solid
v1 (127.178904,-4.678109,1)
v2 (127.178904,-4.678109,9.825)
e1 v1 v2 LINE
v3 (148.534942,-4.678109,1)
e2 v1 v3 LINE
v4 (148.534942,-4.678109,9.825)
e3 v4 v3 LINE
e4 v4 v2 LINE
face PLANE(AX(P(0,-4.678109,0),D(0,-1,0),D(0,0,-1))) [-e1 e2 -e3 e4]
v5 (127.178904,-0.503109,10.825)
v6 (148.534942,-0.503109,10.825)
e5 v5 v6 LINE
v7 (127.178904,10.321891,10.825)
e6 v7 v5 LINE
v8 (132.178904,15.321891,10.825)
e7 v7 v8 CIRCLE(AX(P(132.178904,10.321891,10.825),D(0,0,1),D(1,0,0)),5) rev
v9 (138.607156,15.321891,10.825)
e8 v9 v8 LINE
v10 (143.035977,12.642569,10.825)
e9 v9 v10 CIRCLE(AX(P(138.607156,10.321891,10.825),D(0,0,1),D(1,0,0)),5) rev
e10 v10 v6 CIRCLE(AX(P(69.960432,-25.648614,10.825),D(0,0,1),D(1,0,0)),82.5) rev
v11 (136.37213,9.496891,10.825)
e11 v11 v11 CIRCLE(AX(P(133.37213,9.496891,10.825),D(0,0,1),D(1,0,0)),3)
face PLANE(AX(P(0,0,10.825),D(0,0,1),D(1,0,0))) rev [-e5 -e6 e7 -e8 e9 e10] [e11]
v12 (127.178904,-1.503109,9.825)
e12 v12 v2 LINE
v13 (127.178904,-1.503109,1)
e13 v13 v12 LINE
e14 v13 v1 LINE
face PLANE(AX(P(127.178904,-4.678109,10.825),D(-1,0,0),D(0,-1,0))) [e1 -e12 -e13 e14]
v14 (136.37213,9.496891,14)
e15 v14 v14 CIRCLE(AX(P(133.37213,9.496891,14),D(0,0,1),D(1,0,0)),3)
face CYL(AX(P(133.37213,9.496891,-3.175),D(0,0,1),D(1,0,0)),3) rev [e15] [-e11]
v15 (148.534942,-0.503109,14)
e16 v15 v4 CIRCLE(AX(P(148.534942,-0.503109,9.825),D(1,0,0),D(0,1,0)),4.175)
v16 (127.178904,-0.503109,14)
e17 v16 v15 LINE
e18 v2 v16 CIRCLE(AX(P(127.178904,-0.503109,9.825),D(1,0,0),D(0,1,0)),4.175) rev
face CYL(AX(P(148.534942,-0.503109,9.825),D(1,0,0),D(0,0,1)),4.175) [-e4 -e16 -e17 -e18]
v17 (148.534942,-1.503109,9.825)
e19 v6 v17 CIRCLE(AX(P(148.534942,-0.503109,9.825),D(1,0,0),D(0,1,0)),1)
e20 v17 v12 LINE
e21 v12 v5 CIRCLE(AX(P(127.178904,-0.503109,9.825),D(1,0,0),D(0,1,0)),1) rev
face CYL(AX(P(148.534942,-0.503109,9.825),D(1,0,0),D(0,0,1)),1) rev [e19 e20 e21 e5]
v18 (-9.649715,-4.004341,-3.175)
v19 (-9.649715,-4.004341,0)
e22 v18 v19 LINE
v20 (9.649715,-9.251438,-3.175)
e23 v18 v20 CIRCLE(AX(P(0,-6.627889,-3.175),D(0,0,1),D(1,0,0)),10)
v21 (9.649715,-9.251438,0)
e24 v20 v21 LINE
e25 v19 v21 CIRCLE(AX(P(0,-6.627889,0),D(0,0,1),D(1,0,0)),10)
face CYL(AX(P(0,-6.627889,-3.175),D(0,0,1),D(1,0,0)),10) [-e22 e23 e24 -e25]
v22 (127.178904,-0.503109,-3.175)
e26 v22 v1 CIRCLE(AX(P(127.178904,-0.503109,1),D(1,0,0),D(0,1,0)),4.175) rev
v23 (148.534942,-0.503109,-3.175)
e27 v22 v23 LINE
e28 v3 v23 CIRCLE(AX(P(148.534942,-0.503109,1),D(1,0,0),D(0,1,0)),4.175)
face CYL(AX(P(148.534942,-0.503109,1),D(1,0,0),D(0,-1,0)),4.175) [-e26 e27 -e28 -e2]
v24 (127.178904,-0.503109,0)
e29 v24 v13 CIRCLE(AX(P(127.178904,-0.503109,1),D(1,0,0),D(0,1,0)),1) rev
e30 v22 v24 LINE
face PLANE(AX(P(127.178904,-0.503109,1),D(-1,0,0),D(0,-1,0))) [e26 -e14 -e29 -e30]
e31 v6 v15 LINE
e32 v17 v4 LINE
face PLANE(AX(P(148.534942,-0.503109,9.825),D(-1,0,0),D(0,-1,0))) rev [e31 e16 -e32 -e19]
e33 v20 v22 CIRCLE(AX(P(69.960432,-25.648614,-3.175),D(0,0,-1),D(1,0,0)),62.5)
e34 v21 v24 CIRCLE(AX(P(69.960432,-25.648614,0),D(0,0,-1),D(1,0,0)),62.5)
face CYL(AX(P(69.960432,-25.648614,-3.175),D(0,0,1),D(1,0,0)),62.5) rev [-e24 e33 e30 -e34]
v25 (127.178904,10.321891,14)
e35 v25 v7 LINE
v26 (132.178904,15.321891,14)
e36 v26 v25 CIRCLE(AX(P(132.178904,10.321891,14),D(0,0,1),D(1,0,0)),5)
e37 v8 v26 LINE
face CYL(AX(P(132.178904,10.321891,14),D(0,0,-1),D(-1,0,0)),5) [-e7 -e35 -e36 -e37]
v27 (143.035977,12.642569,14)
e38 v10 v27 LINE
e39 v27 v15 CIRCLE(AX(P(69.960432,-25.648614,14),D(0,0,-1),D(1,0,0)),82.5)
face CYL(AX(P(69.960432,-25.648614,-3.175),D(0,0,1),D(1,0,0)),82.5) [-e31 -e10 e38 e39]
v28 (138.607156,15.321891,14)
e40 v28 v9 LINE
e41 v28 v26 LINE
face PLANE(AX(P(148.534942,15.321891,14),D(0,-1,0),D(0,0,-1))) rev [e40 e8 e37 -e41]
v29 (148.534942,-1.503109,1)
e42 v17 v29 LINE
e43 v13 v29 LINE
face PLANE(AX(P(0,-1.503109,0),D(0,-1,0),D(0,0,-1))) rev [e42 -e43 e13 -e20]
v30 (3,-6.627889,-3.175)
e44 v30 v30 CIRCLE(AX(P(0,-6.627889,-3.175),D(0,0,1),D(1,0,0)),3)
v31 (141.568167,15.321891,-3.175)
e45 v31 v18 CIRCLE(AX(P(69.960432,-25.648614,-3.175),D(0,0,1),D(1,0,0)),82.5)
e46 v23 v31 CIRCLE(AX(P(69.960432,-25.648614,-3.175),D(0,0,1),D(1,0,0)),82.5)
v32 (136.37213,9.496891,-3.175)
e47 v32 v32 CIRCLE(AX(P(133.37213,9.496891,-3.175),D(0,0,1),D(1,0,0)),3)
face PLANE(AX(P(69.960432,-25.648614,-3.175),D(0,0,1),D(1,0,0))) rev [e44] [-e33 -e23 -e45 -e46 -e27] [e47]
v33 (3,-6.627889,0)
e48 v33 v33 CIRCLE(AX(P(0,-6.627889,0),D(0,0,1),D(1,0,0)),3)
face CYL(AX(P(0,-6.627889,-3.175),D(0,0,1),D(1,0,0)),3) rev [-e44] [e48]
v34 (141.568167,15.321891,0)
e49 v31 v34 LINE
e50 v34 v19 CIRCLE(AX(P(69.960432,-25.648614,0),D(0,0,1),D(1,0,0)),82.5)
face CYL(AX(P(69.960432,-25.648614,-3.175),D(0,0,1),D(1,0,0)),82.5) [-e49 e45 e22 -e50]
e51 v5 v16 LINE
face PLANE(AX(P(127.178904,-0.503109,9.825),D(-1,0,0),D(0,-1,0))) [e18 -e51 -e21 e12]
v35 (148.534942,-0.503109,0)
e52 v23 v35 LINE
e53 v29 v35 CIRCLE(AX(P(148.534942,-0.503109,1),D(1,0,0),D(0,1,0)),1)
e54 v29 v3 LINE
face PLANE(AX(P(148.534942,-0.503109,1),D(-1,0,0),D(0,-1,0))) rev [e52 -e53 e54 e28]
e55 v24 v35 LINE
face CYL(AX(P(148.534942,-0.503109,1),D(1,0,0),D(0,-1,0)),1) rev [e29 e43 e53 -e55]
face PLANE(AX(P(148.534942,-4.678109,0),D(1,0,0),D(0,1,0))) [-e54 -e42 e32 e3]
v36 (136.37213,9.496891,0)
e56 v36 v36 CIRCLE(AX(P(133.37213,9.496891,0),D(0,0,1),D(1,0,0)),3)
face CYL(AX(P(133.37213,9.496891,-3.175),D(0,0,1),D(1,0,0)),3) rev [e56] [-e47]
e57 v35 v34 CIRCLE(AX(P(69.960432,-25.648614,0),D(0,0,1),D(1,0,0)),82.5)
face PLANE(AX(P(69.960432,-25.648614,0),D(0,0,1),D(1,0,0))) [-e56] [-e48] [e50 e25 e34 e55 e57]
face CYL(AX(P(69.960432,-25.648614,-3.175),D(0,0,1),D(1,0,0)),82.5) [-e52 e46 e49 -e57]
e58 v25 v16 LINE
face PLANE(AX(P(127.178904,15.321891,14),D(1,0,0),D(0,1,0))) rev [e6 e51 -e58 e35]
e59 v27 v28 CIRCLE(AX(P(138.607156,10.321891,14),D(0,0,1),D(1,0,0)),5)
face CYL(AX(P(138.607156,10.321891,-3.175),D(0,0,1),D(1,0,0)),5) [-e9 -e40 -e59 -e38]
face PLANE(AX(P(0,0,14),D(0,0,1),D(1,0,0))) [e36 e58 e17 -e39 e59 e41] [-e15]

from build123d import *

# Parameters (mm, degrees)
BASE_FLANGE1_DEPTH           = 3.175
EDGE_FLANGE1_DEPTH           = 21.356037378
EDGE_FLANGE2_STRIP_W         = 14.7
EDGE_FLANGE2_STRIP_H         = 3.175
EDGE_FLANGE2_STRIP_CUT_DEPTH = 21.356037378
EDGE_FLANGE2_DEPTH           = 21.356037378
CUT_EXTRUDE1_DEPTH           = 160.658100285
CUT_EXTRUDE1_DEPTH_BACK      = 160.658100285
SKETCH12_R                   = 3
FILLET1_R                    = 5


# Sheet-metal steps are written as plain solids
with BuildPart() as part:
    # Sketch1 → Base-Flange1 (new body)
    with BuildSketch(Plane.XY):
        with BuildLine():
            Line((127.178904259, -0.503108866), (143.372130178, -0.503108866))
            Line((143.372130178, -0.503108866), (148.534941637, -0.503108866))
            ThreePointArc((148.534941637, -0.503108866), (146.210001092, 5.851436917), (143.372130178, 11.994082058))
            ThreePointArc((143.372130178, 11.994082058), (61.381820352, 56.404158269), (-9.649714749, -4.004341098))
            ThreePointArc((-9.649714749, -4.004341098), (-2.623548221, -16.277604067), (9.649714749, -9.251437539))
            ThreePointArc((9.649714749, -9.251437539), (65.321056088, 36.678957766), (127.178904259, -0.503108866))
        make_face()
    extrude(amount=-BASE_FLANGE1_DEPTH)

    # Edge-Flange1 section (across the edge) → Edge-Flange1 (add)
    with BuildSketch(Plane(origin=(127.178904259, -1.503108866, 0), x_dir=(0, 1, 0), z_dir=(1, 0, 0))):
        with BuildLine():
            Line((-3.175, 1), (-3.175, 10.825))
            Line((-3.175, 10.825), (0, 10.825))
            Line((0, 10.825), (0, 1))
            ThreePointArc((0, 1), (0.292893219, 0.292893219), (1, 0))
            Line((1, 0), (1, -3.175))
            ThreePointArc((1, -3.175), (-1.952170811, -1.952170811), (-3.175, 1))
        make_face()
    extrude(amount=EDGE_FLANGE1_DEPTH)

    # Edge-Flange2 strip (across the edge) → Edge-Flange2 strip cut (cut)
    with BuildSketch(Plane(origin=(127.178904259, -1.503108866, 10.825), x_dir=(0, 0, -1), z_dir=(1, 0, 0))):
        with Locations((-6.35, -1.5875)):
            Rectangle(EDGE_FLANGE2_STRIP_W, EDGE_FLANGE2_STRIP_H)
    extrude(amount=EDGE_FLANGE2_STRIP_CUT_DEPTH, mode=Mode.SUBTRACT)

    # Edge-Flange2 section (across the edge) → Edge-Flange2 (add)
    with BuildSketch(Plane(origin=(127.178904259, -1.503108866, 10.825), x_dir=(0, 0, -1), z_dir=(1, 0, 0))):
        with BuildLine():
            Line((-3.175, 1), (-3.175, 16.825))
            Line((-3.175, 16.825), (0, 16.825))
            Line((0, 16.825), (0, 1))
            ThreePointArc((0, 1), (0.292893219, 0.292893219), (1, 0))
            Line((1, 0), (1, -3.175))
            ThreePointArc((1, -3.175), (-1.952170811, -1.952170811), (-3.175, 1))
        make_face()
    extrude(amount=EDGE_FLANGE2_DEPTH)

    # Sketch12 → Cut-Extrude1 (cut, two sides: drawn at the far end of the back side and taken through both)
    with BuildSketch(Plane.XY.offset(-CUT_EXTRUDE1_DEPTH_BACK)):
        with Locations((133.372130178, 9.496891134)):
            Circle(SKETCH12_R)
        with Locations((0, -6.627889318)):
            Circle(SKETCH12_R)
        with BuildLine():
            Line((141.568166958, 15.321891134), (148.534941637, 15.321891134))
            Line((148.534941637, 15.321891134), (148.534941637, -0.503108866))
            ThreePointArc((148.534941637, -0.503108866), (146.210001092, 5.851436917), (143.372130178, 11.994082058))
            ThreePointArc((143.372130178, 11.994082058), (142.48923714, 13.66833427), (141.568166958, 15.321891134))
        make_face()
    extrude(amount=CUT_EXTRUDE1_DEPTH + CUT_EXTRUDE1_DEPTH_BACK, mode=Mode.SUBTRACT)

    # Fillet1
    fillet1_edges = [part.edges().sort_by_distance(p)[0] for p in [
        (127.178904259, 15.321891134, 12.4125),
        (141.568166958, 15.321891134, 12.4125),
    ]]
    fillet(fillet1_edges, radius=FILLET1_R)


solid = part.part
